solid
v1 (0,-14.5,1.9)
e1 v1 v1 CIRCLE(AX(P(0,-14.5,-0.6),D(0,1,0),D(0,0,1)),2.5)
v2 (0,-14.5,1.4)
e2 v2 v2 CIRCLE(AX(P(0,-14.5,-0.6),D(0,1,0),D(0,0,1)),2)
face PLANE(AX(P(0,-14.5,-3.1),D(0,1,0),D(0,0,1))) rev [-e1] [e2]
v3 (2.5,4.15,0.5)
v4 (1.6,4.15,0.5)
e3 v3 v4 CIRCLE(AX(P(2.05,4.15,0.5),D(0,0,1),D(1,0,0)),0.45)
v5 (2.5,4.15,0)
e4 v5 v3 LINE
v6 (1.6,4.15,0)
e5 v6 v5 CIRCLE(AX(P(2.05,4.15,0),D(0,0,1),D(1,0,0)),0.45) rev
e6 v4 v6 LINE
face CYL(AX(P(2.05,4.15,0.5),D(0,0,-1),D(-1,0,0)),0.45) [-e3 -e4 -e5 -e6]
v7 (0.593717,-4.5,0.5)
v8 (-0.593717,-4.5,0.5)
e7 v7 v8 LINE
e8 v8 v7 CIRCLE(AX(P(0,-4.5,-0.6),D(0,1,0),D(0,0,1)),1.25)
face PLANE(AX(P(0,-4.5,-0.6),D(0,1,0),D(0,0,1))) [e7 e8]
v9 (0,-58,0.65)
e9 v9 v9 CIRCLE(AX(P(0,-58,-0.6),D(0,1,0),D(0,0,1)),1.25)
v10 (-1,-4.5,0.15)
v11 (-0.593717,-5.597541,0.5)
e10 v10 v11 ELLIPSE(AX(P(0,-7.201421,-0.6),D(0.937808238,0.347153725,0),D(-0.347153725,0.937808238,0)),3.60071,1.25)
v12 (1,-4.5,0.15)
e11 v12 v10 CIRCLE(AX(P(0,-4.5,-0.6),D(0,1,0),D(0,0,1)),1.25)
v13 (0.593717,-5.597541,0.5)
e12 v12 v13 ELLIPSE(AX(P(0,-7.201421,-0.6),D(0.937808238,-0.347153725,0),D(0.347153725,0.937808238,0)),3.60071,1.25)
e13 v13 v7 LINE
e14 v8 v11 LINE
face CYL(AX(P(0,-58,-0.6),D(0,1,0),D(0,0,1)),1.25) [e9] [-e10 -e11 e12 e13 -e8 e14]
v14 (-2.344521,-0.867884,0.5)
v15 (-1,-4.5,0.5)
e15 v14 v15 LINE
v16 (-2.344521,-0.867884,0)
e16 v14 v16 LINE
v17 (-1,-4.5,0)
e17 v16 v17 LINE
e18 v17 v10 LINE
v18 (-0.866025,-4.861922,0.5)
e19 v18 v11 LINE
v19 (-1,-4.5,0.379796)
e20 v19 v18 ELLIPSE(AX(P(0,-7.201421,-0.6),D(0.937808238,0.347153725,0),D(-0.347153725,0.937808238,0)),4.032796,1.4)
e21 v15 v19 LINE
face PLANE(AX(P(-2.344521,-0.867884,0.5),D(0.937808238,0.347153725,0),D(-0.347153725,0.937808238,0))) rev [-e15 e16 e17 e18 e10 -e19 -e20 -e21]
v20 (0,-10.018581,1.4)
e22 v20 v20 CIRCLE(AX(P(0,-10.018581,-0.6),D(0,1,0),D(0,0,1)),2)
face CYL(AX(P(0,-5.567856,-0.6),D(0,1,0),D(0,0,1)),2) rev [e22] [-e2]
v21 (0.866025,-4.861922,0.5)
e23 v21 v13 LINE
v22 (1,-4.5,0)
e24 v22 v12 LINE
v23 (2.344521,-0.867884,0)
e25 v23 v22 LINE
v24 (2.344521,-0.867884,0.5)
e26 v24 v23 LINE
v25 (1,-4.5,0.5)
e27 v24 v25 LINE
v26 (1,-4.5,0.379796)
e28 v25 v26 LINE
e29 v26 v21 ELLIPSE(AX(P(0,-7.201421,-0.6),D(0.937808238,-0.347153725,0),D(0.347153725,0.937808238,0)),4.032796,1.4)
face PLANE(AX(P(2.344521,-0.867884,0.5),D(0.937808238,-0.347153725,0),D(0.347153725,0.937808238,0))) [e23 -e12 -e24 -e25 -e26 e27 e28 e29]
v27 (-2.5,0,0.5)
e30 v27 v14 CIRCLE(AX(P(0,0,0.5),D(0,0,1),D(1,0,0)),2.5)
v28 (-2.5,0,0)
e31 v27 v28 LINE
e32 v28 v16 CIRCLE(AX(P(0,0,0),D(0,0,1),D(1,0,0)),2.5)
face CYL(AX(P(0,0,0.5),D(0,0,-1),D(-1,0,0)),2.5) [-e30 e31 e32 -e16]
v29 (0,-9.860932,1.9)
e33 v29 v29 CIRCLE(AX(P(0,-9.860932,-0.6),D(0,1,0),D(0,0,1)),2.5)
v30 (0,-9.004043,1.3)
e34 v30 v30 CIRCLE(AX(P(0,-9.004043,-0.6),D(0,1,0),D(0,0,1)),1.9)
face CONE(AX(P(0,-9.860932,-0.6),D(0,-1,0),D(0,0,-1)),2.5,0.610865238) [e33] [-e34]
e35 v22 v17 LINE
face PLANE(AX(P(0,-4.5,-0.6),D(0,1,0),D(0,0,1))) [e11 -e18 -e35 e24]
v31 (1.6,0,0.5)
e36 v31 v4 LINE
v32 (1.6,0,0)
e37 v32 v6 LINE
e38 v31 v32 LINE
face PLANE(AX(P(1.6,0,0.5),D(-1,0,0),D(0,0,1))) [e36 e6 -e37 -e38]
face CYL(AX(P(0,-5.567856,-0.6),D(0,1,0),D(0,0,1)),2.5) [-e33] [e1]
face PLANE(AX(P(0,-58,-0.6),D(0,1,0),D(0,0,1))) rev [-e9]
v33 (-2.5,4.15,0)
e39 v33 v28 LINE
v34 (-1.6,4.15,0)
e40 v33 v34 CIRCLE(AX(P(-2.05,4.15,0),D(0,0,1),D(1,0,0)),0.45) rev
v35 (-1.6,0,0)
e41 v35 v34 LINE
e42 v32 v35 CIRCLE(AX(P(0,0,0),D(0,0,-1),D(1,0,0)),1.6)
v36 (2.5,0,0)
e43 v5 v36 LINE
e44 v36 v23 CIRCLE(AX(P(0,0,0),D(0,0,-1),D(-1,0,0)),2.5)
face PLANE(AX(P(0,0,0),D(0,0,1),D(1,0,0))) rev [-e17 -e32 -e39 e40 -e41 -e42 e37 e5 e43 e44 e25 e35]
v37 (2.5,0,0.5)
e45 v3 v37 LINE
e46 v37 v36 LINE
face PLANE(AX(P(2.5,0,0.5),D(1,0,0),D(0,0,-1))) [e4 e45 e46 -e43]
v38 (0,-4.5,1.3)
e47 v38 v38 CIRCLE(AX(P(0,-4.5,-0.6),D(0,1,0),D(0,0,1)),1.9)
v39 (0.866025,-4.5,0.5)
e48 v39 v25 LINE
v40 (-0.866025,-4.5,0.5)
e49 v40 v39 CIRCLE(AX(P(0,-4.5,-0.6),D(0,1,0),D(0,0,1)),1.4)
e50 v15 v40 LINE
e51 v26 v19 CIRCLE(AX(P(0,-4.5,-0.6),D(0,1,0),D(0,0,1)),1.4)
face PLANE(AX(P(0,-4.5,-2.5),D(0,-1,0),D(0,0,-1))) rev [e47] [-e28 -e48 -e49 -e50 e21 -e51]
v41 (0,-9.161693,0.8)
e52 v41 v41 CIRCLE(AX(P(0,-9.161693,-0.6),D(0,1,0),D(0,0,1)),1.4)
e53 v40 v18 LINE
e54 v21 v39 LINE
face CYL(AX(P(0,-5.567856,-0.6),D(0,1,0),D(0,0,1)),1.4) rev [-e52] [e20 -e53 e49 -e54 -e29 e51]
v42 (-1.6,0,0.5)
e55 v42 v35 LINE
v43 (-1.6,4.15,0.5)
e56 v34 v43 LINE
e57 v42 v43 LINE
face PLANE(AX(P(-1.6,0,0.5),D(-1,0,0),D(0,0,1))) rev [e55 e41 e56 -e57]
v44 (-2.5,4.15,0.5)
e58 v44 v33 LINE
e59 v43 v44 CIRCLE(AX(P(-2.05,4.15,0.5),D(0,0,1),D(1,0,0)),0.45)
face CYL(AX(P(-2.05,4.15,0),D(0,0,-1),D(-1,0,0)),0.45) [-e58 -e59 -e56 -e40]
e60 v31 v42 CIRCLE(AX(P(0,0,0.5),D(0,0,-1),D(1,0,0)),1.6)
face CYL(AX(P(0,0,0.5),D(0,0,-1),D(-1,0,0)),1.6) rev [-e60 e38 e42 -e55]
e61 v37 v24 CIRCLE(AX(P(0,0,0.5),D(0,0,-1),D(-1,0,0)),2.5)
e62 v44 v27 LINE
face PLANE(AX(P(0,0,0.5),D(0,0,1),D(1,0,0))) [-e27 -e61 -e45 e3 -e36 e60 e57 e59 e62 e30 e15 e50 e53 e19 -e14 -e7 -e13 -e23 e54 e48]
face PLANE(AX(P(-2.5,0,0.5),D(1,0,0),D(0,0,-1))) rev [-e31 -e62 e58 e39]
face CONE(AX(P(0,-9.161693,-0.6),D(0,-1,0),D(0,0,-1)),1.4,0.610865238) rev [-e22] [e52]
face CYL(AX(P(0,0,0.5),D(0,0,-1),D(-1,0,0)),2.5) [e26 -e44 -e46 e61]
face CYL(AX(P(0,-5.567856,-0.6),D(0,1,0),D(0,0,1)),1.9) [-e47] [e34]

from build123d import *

# Parameters (mm, degrees)
EXTRUDE_1_DEPTH               = 0.5
FILLET_1_RADIUS               = 0.45
FILLET_1_LENGTH               = 0.5
CHAMFER_1_SIZE                = 0.5
FILLET_1_OF_MIRROR_1_2_RADIUS = 0.45
FILLET_1_OF_MIRROR_1_2_LENGTH = 0.5
CHAMFER_1_OF_MIRROR_1_SIZE    = 0.5
SKETCH_5_R                    = 1.25
EXTRUDE_2_DEPTH               = 53.5


with BuildPart() as part:
    # 草图1 → 凸台-拉伸1 (new body)
    with BuildSketch(Plane.XY):
        with BuildLine():
            Line((-2.344520595, -0.867884312), (-1, -4.5))
            Line((-1, -4.5), (-1, -14.5))
            Line((-1, -14.5), (0, -14.5))
            Line((0, -14.5), (0, -1.6))
            ThreePointArc((0, -1.6), (-1.13137085, -1.13137085), (-1.6, 0))
            Line((-1.6, 0), (-1.6, 4.6))
            Line((-1.6, 4.6), (-2.5, 4.6))
            Line((-2.5, 4.6), (-2.5, 0))
            ThreePointArc((-2.5, 0), (-2.460823184, -0.440850605), (-2.344520595, -0.867884312))
        make_face()
    extrude_1 = extrude(amount=EXTRUDE_1_DEPTH)

    # 圆角1: full round fillet: the end face becomes a half cylinder, R = half its width
    fillet_1_face = Plane((-2.05, 4.6, 0.25), x_dir=(0, 0, 1), z_dir=(0, 1, 0))  # on the end face: x along it, z out of the body
    fillet_1_slab = fillet_1_face.offset(-FILLET_1_RADIUS / 2) * Box(FILLET_1_LENGTH, 2 * FILLET_1_RADIUS, FILLET_1_RADIUS, mode=Mode.PRIVATE)  # the body's end, R deep
    fillet_1_round = Plane((-2.05, 4.15, 0.25), x_dir=(0, 1, 0), z_dir=(0, 0, 1)) * Cylinder(FILLET_1_RADIUS, FILLET_1_LENGTH, mode=Mode.PRIVATE)  # its axis R under the face
    add(fillet_1_slab - fillet_1_round, mode=Mode.SUBTRACT)

    # 倒角1
    chamfer_1_edges = [part.edges().sort_by_distance(p)[0] for p in [
        (-1, -9.5, 0.5),
    ]]
    chamfer(chamfer_1_edges, length=CHAMFER_1_SIZE - 0.0001)  # a hair under: the kernel refuses the full size

    # 镜向1: 凸台-拉伸1 across Right Plane
    add(extrude_1.mirror(Plane(origin=(0, 0, 0), x_dir=(0, 0, -1), z_dir=(1, 0, 0))))

    # 圆角1 of Mirror 1 2: full round fillet: the end face becomes a half cylinder, R = half its width
    fillet_1_of_mirror_1_2_face = Plane((2.05, 4.6, 0.25), x_dir=(0, 0, 1), z_dir=(0, 1, 0))  # on the end face: x along it, z out of the body
    fillet_1_of_mirror_1_2_slab = fillet_1_of_mirror_1_2_face.offset(-FILLET_1_OF_MIRROR_1_2_RADIUS / 2) * Box(FILLET_1_OF_MIRROR_1_2_LENGTH, 2 * FILLET_1_OF_MIRROR_1_2_RADIUS, FILLET_1_OF_MIRROR_1_2_RADIUS, mode=Mode.PRIVATE)  # the body's end, R deep
    fillet_1_of_mirror_1_2_round = Plane((2.05, 4.15, 0.25), x_dir=(0, 1, 0), z_dir=(0, 0, 1)) * Cylinder(FILLET_1_OF_MIRROR_1_2_RADIUS, FILLET_1_OF_MIRROR_1_2_LENGTH, mode=Mode.PRIVATE)  # its axis R under the face
    add(fillet_1_of_mirror_1_2_slab - fillet_1_of_mirror_1_2_round, mode=Mode.SUBTRACT)

    # 倒角1 of 镜向1
    chamfer_1_of_mirror_1_edges = [part.edges().sort_by_distance(p)[0] for p in [
        (1, -9.5, 0.5),
    ]]
    chamfer(chamfer_1_of_mirror_1_edges, length=CHAMFER_1_OF_MIRROR_1_SIZE - 0.0001)  # a hair under: the kernel refuses the full size

    # 草图3 → 旋转1 (revolve)
    with BuildSketch(Plane(origin=(0, 0, 0), x_dir=(0, 0, -1), z_dir=(1, 0, 0)), mode=Mode.PRIVATE) as revolve_1_sk:
        Polygon((2.5, -4.5), (2.5, -9.004043198), (3.1, -9.860932002), (3.1, -14.5), (2.6, -14.5), (2.6, -10.018581397), (2, -9.161692593), (2, -4.5), align=None)
    revolve(revolve_1_sk.sketch.rotate(Axis((0, -5.567856156, -0.6), (0, -1, 0)), 180), axis=Axis((0, -5.567856156, -0.6), (0, -1, 0)))

    # 草图5 → 凸台-拉伸2 (add)
    with BuildSketch(Plane(origin=(0, -4.5, 0), x_dir=(1, 0, 0), z_dir=(0, 1, 0))):
        with Locations(Location((0, 0.6, 0), (0, 0, 270))):
            Circle(SKETCH_5_R)
    extrude(amount=-EXTRUDE_2_DEPTH)


solid = part.part
